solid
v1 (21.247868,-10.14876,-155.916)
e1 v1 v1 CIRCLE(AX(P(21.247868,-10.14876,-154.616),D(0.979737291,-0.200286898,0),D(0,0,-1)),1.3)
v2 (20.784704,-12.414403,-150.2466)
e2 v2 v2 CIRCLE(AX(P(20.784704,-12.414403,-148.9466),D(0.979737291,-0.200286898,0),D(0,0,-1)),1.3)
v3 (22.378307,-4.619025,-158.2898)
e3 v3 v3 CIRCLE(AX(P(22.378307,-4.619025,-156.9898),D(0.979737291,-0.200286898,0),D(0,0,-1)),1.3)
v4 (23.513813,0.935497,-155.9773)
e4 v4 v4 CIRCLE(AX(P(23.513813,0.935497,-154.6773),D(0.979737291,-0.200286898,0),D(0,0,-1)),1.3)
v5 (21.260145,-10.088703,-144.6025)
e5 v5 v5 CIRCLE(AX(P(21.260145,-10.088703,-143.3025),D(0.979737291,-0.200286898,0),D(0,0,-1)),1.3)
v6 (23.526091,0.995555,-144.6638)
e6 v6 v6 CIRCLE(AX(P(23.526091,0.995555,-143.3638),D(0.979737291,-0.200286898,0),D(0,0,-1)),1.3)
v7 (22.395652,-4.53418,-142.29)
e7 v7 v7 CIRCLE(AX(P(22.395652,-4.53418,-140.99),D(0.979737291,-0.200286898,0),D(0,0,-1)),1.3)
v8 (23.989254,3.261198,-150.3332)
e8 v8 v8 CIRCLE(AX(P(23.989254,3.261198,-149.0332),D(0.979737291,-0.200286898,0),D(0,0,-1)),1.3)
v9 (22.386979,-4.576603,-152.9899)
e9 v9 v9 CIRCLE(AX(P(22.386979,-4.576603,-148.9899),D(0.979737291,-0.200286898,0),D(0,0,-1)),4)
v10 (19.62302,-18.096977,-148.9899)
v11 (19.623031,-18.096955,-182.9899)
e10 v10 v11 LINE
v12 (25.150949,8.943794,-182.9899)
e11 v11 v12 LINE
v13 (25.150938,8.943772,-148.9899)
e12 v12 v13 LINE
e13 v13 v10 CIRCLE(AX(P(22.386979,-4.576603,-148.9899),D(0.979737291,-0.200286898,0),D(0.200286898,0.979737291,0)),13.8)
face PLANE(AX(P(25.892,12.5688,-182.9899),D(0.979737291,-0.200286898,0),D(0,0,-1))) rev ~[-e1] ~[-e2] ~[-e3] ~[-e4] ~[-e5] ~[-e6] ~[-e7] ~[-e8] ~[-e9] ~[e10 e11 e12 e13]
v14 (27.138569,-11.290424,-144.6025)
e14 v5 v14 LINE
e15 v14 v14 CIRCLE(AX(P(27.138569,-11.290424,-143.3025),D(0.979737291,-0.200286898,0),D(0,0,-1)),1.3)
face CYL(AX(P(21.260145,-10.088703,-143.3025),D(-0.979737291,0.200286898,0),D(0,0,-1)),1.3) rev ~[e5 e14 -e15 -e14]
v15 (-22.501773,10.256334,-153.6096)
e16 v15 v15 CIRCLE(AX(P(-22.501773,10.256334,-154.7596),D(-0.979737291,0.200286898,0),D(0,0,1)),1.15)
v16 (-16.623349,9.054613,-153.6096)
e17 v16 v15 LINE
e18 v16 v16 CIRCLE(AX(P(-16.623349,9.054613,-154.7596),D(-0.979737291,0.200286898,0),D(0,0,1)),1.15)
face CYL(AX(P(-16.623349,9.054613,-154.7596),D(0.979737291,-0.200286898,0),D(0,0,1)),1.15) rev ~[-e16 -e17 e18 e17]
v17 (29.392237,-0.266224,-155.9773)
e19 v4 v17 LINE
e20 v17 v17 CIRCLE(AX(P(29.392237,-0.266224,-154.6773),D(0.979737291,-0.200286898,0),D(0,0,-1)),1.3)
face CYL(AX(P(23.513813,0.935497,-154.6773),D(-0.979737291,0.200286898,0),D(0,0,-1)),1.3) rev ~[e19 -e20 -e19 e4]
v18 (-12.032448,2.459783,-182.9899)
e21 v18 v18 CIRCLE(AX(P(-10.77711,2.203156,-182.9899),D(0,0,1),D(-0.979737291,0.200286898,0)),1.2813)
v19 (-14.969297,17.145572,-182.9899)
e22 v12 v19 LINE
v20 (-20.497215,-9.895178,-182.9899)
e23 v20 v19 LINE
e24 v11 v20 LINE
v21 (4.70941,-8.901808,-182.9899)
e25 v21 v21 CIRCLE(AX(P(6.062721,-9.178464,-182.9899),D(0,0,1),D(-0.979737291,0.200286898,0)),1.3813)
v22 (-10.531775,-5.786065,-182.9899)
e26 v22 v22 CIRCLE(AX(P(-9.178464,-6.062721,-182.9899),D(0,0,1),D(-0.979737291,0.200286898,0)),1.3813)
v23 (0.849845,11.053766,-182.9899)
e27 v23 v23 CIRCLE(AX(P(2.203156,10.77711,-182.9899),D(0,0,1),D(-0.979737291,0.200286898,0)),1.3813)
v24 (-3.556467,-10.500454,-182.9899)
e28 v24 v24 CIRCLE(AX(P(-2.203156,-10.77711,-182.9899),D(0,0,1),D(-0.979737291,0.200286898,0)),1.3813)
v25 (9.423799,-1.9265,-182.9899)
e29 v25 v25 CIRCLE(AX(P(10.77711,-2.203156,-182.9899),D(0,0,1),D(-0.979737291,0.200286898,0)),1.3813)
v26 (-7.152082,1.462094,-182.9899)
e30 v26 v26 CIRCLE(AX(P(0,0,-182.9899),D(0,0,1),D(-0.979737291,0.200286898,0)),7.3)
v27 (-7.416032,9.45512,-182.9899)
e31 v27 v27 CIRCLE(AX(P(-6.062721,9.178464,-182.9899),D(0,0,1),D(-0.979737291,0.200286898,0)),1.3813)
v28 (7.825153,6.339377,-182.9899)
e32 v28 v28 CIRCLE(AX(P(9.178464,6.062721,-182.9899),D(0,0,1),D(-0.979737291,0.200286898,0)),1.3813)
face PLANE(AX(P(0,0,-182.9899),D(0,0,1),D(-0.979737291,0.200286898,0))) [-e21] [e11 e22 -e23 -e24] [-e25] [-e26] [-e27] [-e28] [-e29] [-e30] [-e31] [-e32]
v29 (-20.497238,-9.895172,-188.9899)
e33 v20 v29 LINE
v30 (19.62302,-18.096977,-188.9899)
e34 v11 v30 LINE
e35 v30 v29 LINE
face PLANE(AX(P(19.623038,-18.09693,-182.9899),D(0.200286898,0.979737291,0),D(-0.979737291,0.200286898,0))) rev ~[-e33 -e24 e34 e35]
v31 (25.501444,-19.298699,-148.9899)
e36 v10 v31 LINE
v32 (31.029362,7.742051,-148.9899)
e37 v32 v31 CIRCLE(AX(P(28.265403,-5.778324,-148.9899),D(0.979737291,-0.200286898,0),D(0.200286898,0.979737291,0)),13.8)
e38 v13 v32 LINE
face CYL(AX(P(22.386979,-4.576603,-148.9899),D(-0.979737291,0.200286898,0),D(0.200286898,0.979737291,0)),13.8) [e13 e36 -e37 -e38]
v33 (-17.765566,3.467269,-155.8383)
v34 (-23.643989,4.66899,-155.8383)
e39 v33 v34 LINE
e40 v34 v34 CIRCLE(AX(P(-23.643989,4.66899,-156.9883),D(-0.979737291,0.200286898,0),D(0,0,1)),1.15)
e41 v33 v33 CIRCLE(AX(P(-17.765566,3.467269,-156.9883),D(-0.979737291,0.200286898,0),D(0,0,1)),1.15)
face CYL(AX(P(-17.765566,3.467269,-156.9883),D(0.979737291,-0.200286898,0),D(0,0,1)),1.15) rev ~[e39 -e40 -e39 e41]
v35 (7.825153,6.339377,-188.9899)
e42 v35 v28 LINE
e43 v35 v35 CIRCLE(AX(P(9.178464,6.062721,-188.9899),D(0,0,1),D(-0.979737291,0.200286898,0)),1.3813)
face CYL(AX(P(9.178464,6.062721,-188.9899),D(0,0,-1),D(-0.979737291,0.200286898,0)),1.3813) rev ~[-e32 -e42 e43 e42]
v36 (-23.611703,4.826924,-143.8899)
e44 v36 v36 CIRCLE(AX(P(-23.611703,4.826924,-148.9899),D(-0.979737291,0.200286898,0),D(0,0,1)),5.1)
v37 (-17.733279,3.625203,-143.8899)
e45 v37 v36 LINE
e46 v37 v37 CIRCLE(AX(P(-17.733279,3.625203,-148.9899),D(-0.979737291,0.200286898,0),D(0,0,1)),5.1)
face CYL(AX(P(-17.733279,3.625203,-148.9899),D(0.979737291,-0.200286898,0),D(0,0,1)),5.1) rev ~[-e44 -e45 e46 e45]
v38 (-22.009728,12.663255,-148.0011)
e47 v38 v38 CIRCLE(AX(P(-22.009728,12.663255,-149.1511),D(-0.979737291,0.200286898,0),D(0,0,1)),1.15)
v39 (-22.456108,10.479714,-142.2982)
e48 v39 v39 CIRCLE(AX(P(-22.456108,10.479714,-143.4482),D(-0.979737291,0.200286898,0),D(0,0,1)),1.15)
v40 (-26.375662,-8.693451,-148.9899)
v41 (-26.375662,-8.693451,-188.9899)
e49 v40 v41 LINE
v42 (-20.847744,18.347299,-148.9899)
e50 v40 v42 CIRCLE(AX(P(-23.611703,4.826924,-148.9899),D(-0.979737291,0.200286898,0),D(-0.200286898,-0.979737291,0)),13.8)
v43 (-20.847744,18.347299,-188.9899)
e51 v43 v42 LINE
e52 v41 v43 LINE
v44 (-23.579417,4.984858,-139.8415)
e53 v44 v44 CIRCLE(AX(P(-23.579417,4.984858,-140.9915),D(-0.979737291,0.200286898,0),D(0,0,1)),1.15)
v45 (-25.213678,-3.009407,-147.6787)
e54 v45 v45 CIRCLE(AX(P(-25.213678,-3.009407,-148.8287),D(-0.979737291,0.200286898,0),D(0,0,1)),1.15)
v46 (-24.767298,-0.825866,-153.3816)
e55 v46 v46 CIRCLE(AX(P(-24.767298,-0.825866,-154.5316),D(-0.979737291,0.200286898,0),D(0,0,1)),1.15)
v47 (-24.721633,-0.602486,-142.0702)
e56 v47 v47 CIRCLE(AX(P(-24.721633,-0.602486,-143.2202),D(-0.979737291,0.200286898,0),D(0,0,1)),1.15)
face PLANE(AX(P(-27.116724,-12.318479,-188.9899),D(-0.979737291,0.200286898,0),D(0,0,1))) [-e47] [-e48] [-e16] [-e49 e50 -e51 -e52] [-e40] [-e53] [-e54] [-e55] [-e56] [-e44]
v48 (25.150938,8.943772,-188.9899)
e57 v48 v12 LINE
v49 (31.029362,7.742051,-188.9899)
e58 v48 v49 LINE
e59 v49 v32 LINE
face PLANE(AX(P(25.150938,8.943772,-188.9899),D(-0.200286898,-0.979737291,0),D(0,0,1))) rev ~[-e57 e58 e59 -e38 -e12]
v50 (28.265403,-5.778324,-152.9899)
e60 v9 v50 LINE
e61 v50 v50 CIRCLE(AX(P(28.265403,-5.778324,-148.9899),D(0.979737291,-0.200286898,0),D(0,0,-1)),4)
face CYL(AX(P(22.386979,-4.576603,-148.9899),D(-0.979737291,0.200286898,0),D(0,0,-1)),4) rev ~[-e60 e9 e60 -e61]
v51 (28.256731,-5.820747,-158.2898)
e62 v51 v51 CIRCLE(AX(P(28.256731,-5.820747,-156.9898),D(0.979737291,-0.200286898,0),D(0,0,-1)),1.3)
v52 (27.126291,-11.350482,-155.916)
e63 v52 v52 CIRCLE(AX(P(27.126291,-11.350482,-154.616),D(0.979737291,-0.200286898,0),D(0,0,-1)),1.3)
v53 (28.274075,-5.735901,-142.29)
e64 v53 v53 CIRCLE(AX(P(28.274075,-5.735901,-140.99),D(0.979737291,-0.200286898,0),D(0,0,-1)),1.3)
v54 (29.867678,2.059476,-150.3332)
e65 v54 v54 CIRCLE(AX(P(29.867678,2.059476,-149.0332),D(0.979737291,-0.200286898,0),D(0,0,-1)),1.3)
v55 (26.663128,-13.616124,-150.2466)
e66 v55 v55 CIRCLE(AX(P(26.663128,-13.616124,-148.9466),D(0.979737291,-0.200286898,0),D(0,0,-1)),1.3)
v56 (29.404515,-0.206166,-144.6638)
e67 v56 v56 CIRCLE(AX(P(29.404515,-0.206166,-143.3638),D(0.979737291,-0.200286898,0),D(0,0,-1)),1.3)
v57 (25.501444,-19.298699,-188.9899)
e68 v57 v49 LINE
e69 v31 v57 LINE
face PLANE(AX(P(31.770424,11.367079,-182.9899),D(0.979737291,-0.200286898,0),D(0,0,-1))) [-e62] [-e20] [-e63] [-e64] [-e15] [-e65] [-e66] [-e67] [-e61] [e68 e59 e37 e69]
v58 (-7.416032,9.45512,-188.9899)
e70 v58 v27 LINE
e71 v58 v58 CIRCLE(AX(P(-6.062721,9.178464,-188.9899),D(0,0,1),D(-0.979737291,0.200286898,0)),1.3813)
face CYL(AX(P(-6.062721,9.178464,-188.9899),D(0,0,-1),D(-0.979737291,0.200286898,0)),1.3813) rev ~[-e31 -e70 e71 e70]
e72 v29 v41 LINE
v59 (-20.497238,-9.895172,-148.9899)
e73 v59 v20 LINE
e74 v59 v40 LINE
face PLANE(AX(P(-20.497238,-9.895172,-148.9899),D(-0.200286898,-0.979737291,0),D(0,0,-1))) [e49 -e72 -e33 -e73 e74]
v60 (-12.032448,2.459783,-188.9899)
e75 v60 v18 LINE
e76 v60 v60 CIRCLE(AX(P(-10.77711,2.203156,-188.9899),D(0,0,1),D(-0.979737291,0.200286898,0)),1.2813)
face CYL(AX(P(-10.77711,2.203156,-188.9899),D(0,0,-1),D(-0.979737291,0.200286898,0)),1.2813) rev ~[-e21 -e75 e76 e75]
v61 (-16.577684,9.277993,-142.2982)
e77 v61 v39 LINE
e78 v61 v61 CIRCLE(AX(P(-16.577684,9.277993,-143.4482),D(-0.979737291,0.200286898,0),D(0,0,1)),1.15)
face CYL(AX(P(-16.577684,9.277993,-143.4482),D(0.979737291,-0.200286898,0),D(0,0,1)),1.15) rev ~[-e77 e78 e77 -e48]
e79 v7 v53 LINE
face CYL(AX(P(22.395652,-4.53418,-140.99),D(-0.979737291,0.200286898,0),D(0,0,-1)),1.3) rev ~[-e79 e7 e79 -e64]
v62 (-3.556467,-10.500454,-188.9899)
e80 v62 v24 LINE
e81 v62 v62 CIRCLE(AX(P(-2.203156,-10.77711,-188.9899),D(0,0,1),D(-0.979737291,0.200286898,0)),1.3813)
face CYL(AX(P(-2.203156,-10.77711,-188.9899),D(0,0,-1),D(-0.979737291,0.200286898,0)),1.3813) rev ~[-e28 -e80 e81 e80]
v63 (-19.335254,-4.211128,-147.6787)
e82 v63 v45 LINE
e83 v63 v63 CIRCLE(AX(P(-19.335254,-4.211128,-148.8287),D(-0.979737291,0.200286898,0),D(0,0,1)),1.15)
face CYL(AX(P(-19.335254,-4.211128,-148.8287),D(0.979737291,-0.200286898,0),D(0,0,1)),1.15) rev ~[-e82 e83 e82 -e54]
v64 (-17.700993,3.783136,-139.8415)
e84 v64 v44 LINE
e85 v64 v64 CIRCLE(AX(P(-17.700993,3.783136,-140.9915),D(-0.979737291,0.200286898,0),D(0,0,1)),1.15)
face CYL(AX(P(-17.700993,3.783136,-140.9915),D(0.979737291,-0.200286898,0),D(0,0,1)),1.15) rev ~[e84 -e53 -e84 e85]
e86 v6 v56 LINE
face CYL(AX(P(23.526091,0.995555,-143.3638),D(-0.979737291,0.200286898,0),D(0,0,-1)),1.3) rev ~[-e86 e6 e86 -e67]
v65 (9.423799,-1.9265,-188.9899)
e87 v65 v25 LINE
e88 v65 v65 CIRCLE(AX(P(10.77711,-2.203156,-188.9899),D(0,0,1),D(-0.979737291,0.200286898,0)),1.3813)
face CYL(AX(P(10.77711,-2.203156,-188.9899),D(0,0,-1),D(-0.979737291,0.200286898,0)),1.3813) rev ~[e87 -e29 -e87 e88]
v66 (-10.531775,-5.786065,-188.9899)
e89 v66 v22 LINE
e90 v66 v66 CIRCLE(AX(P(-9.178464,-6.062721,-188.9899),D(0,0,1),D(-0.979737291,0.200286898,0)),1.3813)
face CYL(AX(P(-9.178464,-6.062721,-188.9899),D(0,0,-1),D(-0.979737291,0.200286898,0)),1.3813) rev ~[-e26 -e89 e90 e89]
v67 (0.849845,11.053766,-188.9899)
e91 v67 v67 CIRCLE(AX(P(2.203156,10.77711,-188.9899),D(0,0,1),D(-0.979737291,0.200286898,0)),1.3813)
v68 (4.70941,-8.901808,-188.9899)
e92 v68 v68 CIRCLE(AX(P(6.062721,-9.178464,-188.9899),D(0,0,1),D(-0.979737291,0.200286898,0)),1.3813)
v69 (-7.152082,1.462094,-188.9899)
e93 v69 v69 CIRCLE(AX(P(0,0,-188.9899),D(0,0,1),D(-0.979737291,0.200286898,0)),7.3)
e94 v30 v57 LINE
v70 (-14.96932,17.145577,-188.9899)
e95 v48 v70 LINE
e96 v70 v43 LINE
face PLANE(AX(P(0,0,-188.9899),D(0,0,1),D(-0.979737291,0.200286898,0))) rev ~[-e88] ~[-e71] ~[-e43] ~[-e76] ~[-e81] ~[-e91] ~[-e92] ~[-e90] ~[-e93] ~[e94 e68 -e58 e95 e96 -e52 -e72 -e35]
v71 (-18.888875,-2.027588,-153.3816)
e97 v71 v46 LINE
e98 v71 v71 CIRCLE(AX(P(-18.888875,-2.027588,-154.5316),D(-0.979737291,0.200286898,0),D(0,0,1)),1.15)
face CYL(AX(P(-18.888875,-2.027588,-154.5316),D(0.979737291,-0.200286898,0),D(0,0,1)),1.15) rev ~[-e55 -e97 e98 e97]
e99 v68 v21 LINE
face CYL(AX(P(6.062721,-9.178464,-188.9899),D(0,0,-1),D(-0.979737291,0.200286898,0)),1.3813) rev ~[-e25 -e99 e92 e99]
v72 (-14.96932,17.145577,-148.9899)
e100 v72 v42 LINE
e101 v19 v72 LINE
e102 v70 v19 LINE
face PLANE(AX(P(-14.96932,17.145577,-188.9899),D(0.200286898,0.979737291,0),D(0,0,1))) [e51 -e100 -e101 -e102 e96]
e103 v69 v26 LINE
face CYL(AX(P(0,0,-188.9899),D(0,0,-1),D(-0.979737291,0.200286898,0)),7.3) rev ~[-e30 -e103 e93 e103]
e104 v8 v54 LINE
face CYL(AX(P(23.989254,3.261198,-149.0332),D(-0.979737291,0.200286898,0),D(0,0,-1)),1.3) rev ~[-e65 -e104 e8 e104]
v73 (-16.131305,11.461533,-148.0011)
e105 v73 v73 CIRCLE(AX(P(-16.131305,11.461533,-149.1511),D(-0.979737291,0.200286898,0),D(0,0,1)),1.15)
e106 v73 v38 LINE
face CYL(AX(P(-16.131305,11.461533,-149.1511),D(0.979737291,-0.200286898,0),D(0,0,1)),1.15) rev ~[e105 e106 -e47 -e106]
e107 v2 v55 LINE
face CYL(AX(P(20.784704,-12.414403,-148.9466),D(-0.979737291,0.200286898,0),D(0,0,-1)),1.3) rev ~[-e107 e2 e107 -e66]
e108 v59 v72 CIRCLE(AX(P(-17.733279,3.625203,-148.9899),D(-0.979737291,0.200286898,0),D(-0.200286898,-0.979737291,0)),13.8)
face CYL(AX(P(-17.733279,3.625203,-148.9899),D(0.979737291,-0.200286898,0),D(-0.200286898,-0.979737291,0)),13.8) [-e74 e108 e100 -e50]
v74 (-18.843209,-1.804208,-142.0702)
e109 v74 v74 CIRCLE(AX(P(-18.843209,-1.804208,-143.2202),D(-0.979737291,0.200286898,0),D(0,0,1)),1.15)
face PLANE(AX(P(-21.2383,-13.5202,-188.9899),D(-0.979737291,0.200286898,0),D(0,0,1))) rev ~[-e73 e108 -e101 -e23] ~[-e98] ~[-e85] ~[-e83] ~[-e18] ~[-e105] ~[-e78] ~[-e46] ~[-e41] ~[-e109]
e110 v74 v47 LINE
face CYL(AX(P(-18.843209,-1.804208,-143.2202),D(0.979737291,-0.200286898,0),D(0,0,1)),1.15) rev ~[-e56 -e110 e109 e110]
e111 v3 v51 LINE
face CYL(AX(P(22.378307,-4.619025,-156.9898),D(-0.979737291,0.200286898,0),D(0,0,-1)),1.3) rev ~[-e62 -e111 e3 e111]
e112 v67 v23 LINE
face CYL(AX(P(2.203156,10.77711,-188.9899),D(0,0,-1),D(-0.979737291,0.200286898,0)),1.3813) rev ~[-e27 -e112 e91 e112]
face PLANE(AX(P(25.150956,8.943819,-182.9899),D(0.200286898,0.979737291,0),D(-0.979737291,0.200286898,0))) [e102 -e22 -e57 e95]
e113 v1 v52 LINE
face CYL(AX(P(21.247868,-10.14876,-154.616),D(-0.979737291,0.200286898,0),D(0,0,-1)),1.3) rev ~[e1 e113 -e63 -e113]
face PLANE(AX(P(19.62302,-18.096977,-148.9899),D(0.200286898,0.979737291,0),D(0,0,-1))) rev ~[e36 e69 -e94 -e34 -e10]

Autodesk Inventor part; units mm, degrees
ref_plane "YZ Plane" through (0, 0, 0) normal (1, 0, 0) x (0, 1, 0)
ref_plane "XZ Plane" through (0, 0, 0) normal (0, 1, 0) x (-1, 0, 0)
ref_plane "XY Plane" through (0, 0, 0) normal (0, 0, 1) x (1, 0, 0)
ref_plane "작업 평면1" through (0, 0, -188.9899) normal (0, 0, 1) x (-0.9797373, 0.2002869, 0)
sketch "스케치1" plane through (0, 0, -188.9899) normal (0, 0, 1) x (-0.9797373, 0.2002869, 0)
  circle A0 centre (0, 0) radius 13.8 projected
  circle A1 centre (0, 0) radius 7.2 projected
  circle A2 centre (0, -11) radius 1.2813 projected
  circle A3 centre (-7.7782, -7.7782) radius 1.2813 projected
  circle A4 centre (-11, 0) radius 1.2813 projected
  circle A5 centre (-7.7782, 7.7782) radius 1.2813 projected
  circle A6 centre (0, 11) radius 1.2813 projected
  circle A7 centre (7.7782, 7.7782) radius 1.2813 projected
  circle A8 centre (11, 0) radius 1.2813 projected
  circle A9 centre (7.7782, -7.7782) radius 1.2813 projected
  line L0 (-17.5, -17.5) -> (17.5, -17.5)
  line L1 (17.5, -17.5) -> (17.5, 17.5)
  line L2 (17.5, 17.5) -> (-17.5, 17.5)
  line L3 (-17.5, 17.5) -> (-17.5, -17.5)
  line L4 (-17.5, -17.5) -> (17.5, 17.5) construction
  line L5 (17.5, -17.5) -> (-17.5, 17.5) construction
  circle A10 centre (0, 0) radius 7.3
  circle A11 centre (-11, 0) radius 1.3813
  circle A12 centre (-7.7782, 7.7782) radius 1.3813
  circle A13 centre (0, 11) radius 1.3813
  circle A14 centre (7.7782, 7.7782) radius 1.3813
  circle A15 centre (11, 0) radius 1.1813
  circle A16 centre (7.7782, -7.7782) radius 1.3813
  circle A17 centre (0, -11) radius 1.3813
  circle A18 centre (-7.7782, -7.7782) radius 1.3813
  line L6 (17.2724, -17.5) -> (17.2724, -18.1)
  line L7 (17.1076, 17.5) -> (17.1076, 22.85)
  line L8 (17.1076, 17.5) -> (22.4576, 17.5) construction
  line L9 (17.5, 22.85) -> (16.9, 22.85)
  line L10 (16.9, 22.85) -> (16.9, -18.1)
  line L11 (16.9, -18.1) -> (17.5, -18.1)
  line L12 (17.5, -18.1) -> (17.5, 22.85)
  line L13 (17.5, -18.1) -> (-17.5, -18.1)
  line L14 (-17.5, -18.1) -> (-17.5, 22.85)
  line L15 (-17.5, 22.85) -> (17.5, 22.85)
  line L16 (17.5, 22.85) -> (17.5, -18.1)
  line L17 (17.5, 17.5) -> (18.1, 17.5)
  line L18 (18.1, 17.5) -> (18.1, -17.5)
  line L19 (18.1, -17.5) -> (17.5, -17.5)
  line L20 (17.5, -17.5) -> (17.5, 17.5)
  line L21 (-17.5, 17.5) -> (-22.85, 17.5)
  line L22 (-22.85, 17.5) -> (-22.85, 15.9604)
  line L23 (-22.85, 15.9604) -> (-17.5, 15.9604)
  line L24 (-17.5, 15.9604) -> (-17.5, 17.5)
  line L25 (-22.85, 17.5) -> (-17.5, 17.5)
  line L26 (-17.5, 17.5) -> (-17.5, -17.5)
  line L27 (-17.5, -17.5) -> (-22.85, -17.5)
  line L28 (-22.85, -17.5) -> (-22.85, 17.5)
  point P0 (0, 0)
  point P1 (17.5, -17.5)
  point P2 (-17.5, -17.5)
  point P3 (16.9, -18.1)
  point P4 (16.9, 22.85)
  point P5 (-17.5, 17.5)
  point P6 (17.5, 17.5)
  point P7 (-22.85, 15.9604)
  point P8 (17.5, -17.5)
  dimension "d0" = 35
  dimension "d1" = 35
  dimension "d2" = 0.1
  dimension "d3" = 0.1
  dimension "d4" = 0.1
  dimension "d5" = 0.1
  dimension "d6" = 0.1
  dimension "d7" = 0.1
  dimension "d8" = 0.1
  dimension "d9" = 0.1
  dimension "d10" = 0.1
  dimension "d13" = 0.6
  dimension "d14" = 5.35
  dimension "d15" = 90
  dimension "d16" = 0.6
  dimension "d17" = 5.35
extrude "돌출1" add sketch "스케치1" along normal blind 6 contours A0 | L0 L10 L2 L1 | L1 L17 L18 L19 | L0 L3 L2 L10 | L27 L28 L23 L3 | L23 L22 L21 L3
sketch "스케치3" plane through (25.892, 12.5688, -182.9899) normal (0.9797373, -0.2002869, 0) x (0, 0, -1)
  circle A0 centre (2.59, -25.3) radius 1.55 projected
  circle A1 centre (2.59, -9.7) radius 1.55 projected
  line L0 (-34, -31.3) -> (6, -31.3) projected
  line L1 (6, -31.3) -> (6, -3.7) projected
  line L2 (6, -3.7) -> (-34, -3.7) projected
  arc A2 (-34, -3.7) -> (-34, -31.3) centre (-34, -17.5) ccw projected
  circle A3 centre (-41.7782, -25.2782) radius 1.65 projected
  circle A4 centre (-45, -17.5) radius 1.65 projected
  circle A5 centre (-41.7782, -9.7218) radius 1.65 projected
  circle A6 centre (-34, -6.5) radius 1.65 projected
  circle A7 centre (-26.2218, -9.7218) radius 1.65 projected
  circle A8 centre (-23, -17.5) radius 1.65 projected
  circle A9 centre (-26.2218, -25.2782) radius 1.65 projected
  circle A10 centre (-34, -28.5) radius 1.65 projected
  circle A11 centre (-34, -17.5) radius 5.1 projected
  circle A12 centre (-34, -17.5) radius 3.9 projected
  circle A13 centre (-34, -17.5) radius 4
  circle A14 centre (-28.3126, -11.8739) radius 1.2 projected
  circle A15 centre (-39.6261, -11.8126) radius 1.2 projected
  circle A16 centre (-39.6874, -23.1261) radius 1.2 projected
  circle A17 centre (-28.3739, -23.1874) radius 1.2 projected
  circle A18 centre (-34, -17.5) radius 4 projected
  circle A19 centre (-34, -17.5) radius 10.9 projected
  circle A20 centre (-34.0433, -25.4999) radius 1.2 projected
  circle A21 centre (-41.9999, -17.4567) radius 1.2 projected
  circle A22 centre (-33.9567, -9.5001) radius 1.2 projected
  circle A23 centre (-26.0001, -17.5433) radius 1.2 projected
  circle A24 centre (-34, -17.5) radius 3.5 projected
  circle A25 centre (-34, -17.5) radius 5.2
  circle A26 centre (-26.0001, -17.5433) radius 1.3
  circle A27 centre (-28.3739, -23.1874) radius 1.3
  circle A28 centre (-34.0433, -25.4999) radius 1.3
  circle A29 centre (-39.6874, -23.1261) radius 1.3
  circle A30 centre (-41.9999, -17.4567) radius 1.3
  circle A31 centre (-39.6261, -11.8126) radius 1.3
  circle A32 centre (-33.9567, -9.5001) radius 1.3
  circle A33 centre (-28.3126, -11.8739) radius 1.3
  point P0 (-182.9899, -17.5)
  dimension "d22" = 0.1
  dimension "d23" = 0.1
  dimension "d24" = 0.1
  dimension "d25" = 0.1
  dimension "d26" = 0.1
  dimension "d27" = 0.1
  dimension "d28" = 0.1
  dimension "d29" = 0.1
  dimension "d30" = 0.1
  dimension "d31" = 0.1
extrude "돌출2" add sketch "스케치3" along normal blind 6 contours A0 | A1 | A2 L2 L1 L0 | A3 A19 | A3 A19 A4 A5 A6 A7 A8 A9 A10 | A19 A3 | A19 A4 | A4 A19 | A19 A10 | A10 A19 | A19 A5 | A5 A19 | A19 A9 | A9 A19 | A19 A6 | A6 A19 | A19 A8 | A8 A19 | A19 A7 | A7 A19 | A11 | A25
sketch "스케치4" plane through (-21.2383, -13.5202, -188.9899) normal (-0.9797373, 0.2002869, 0) x (0, 0, 1)
  circle A0 centre (3.41, 9.7) radius 1.55 projected
  circle A1 centre (3.41, 25.3) radius 1.55 projected
  line L0 (40, 3.7) -> (0, 3.7) projected
  arc A2 (40, 3.7) -> (40, 31.3) centre (40, 17.5) ccw projected
  line L1 (0, 31.3) -> (40, 31.3) projected
  line L2 (0, 3.7) -> (0, 31.3) projected
  circle A3 centre (47.7782, 9.7218) radius 1.65 projected
  circle A4 centre (51, 17.5) radius 1.65 projected
  circle A5 centre (47.7782, 25.2782) radius 1.65 projected
  circle A6 centre (40, 28.5) radius 1.65 projected
  circle A7 centre (32.2218, 25.2782) radius 1.65 projected
  circle A8 centre (29, 17.5) radius 1.65 projected
  circle A9 centre (32.2218, 9.7218) radius 1.65 projected
  circle A10 centre (40, 6.5) radius 1.65 projected
  circle A11 centre (40, 17.5) radius 5.1 projected
  circle A12 centre (40, 17.5) radius 10.8 projected
  circle A13 centre (40, 17.5) radius 6 projected
  circle A14 centre (47.9984, 17.6612) radius 1.05 projected
  circle A15 centre (45.7697, 11.9583) radius 1.05 projected
  circle A16 centre (40.1612, 9.5016) radius 1.05 projected
  circle A17 centre (34.4583, 11.7303) radius 1.05 projected
  circle A18 centre (32.0016, 17.3388) radius 1.05 projected
  circle A19 centre (34.2303, 23.0417) radius 1.05 projected
  circle A20 centre (39.8388, 25.4984) radius 1.05 projected
  circle A21 centre (45.5417, 23.2697) radius 1.05 projected
  circle A22 centre (39.8388, 25.4984) radius 1.15
  circle A23 centre (34.2303, 23.0417) radius 1.15
  circle A24 centre (32.0016, 17.3388) radius 1.15
  circle A25 centre (34.4583, 11.7303) radius 1.15
  circle A26 centre (40.1612, 9.5016) radius 1.15
  circle A27 centre (45.7697, 11.9583) radius 1.15
  circle A28 centre (47.9984, 17.6612) radius 1.15
  circle A29 centre (45.5417, 23.2697) radius 1.15
  point P0 (188.9899, 17.5)
  dimension "d32" = 0.1
  dimension "d33" = 0.1
  dimension "d34" = 0.1
  dimension "d35" = 0.1
  dimension "d36" = 0.1
  dimension "d37" = 0.1
  dimension "d38" = 0.1
  dimension "d39" = 0.1
extrude "돌출3" add sketch "스케치4" along normal blind 6 contours A0 | A1 | L0 L2 L1 A2 | A3 A12 | A12 A3 | A3 A12 A10 A9 A8 A7 A6 A5 A4 | A12 A4 | A4 A12 | A12 A10 | A10 A12 | A12 A5 | A5 A12 | A12 A9 | A9 A12 | A12 A6 | A6 A12 | A12 A8 | A8 A12 | A12 A7 | A7 A12 | A13
sketch "스케치5" plane through (0, 0, -182.9899) normal (0, 0, 1) x (0.9797373, -0.2002869, 0)
  line L0 (22.85, 13.8) -> (22.85, -13.8) projected
  line L1 (22.85, -13.8) -> (28.85, -13.8) projected
  line L2 (28.85, 13.8) -> (28.85, -13.8) projected
  line L3 (22.85, 13.8) -> (28.85, 13.8) projected
  line L4 (-18.1, -13.8) -> (-18.1, 13.8) projected
  line L5 (-18.1, 13.8) -> (-24.1, 13.8) projected
  line L6 (-24.1, -13.8) -> (-24.1, 13.8) projected
  line L7 (-18.1, -13.8) -> (-24.1, -13.8) projected
  line L8 (22.85, -17.5) -> (22.85, -13.8) projected
  line L9 (-18.1, -13.8) -> (-18.1, -17.5) projected
  line L10 (22.85, -13.8) -> (-18.1, -13.8)
  line L11 (-18.1, -13.8) -> (-18.1, -17.5)
  line L12 (-18.1, -17.5) -> (22.85, -17.5)
  line L13 (22.85, -17.5) -> (22.85, -13.8)
  line L14 (-18.1, -17.5) -> (22.85, -17.5) projected
  line L15 (22.85, -17.5) -> (22.85, -13.8) projected
  line L16 (22.85, -13.8) -> (22.85, 13.8) projected
  line L17 (22.85, 13.8) -> (22.85, 17.5) projected
  line L18 (22.85, 17.5) -> (-18.1, 17.5) projected
  line L19 (-18.1, 17.5) -> (-18.1, 13.8) projected
  line L20 (-18.1, 13.8) -> (-18.1, -13.8) projected
  line L21 (-18.1, -13.8) -> (-18.1, -17.5) projected
  circle A0 centre (-11, 0) radius 1.2813 projected
  circle A1 centre (0, 0) radius 7.3 projected
  circle A2 centre (11, 0) radius 1.3813 projected
  circle A3 centre (7.7782, -7.7782) radius 1.3813 projected
  circle A4 centre (0, -11) radius 1.3813 projected
  circle A5 centre (-7.7782, -7.7782) radius 1.3813 projected
  circle A6 centre (-7.7782, 7.7782) radius 1.3813 projected
  circle A7 centre (0, 11) radius 1.3813 projected
  circle A8 centre (7.7782, 7.7782) radius 1.3813 projected
  line L22 (22.85, 13.8) -> (-18.3673, 13.8)
  line L23 (-18.3673, 13.8) -> (-18.3673, 17.5)
  line L24 (-18.3673, 17.5) -> (22.85, 17.5)
  line L25 (22.85, 17.5) -> (22.85, 13.8)
  point P0 (0, 0)
  point P1 (-18.1, 13.8)
  point P2 (-18.1, -13.8)
  point P3 (22.85, -17.5)
extrude "돌출4" cut sketch "스케치5" against normal blind 10 contours L22 L19 L18 L17 | L8 L12 L9 L10
properties part number "37" material "LCP 플라스틱"
